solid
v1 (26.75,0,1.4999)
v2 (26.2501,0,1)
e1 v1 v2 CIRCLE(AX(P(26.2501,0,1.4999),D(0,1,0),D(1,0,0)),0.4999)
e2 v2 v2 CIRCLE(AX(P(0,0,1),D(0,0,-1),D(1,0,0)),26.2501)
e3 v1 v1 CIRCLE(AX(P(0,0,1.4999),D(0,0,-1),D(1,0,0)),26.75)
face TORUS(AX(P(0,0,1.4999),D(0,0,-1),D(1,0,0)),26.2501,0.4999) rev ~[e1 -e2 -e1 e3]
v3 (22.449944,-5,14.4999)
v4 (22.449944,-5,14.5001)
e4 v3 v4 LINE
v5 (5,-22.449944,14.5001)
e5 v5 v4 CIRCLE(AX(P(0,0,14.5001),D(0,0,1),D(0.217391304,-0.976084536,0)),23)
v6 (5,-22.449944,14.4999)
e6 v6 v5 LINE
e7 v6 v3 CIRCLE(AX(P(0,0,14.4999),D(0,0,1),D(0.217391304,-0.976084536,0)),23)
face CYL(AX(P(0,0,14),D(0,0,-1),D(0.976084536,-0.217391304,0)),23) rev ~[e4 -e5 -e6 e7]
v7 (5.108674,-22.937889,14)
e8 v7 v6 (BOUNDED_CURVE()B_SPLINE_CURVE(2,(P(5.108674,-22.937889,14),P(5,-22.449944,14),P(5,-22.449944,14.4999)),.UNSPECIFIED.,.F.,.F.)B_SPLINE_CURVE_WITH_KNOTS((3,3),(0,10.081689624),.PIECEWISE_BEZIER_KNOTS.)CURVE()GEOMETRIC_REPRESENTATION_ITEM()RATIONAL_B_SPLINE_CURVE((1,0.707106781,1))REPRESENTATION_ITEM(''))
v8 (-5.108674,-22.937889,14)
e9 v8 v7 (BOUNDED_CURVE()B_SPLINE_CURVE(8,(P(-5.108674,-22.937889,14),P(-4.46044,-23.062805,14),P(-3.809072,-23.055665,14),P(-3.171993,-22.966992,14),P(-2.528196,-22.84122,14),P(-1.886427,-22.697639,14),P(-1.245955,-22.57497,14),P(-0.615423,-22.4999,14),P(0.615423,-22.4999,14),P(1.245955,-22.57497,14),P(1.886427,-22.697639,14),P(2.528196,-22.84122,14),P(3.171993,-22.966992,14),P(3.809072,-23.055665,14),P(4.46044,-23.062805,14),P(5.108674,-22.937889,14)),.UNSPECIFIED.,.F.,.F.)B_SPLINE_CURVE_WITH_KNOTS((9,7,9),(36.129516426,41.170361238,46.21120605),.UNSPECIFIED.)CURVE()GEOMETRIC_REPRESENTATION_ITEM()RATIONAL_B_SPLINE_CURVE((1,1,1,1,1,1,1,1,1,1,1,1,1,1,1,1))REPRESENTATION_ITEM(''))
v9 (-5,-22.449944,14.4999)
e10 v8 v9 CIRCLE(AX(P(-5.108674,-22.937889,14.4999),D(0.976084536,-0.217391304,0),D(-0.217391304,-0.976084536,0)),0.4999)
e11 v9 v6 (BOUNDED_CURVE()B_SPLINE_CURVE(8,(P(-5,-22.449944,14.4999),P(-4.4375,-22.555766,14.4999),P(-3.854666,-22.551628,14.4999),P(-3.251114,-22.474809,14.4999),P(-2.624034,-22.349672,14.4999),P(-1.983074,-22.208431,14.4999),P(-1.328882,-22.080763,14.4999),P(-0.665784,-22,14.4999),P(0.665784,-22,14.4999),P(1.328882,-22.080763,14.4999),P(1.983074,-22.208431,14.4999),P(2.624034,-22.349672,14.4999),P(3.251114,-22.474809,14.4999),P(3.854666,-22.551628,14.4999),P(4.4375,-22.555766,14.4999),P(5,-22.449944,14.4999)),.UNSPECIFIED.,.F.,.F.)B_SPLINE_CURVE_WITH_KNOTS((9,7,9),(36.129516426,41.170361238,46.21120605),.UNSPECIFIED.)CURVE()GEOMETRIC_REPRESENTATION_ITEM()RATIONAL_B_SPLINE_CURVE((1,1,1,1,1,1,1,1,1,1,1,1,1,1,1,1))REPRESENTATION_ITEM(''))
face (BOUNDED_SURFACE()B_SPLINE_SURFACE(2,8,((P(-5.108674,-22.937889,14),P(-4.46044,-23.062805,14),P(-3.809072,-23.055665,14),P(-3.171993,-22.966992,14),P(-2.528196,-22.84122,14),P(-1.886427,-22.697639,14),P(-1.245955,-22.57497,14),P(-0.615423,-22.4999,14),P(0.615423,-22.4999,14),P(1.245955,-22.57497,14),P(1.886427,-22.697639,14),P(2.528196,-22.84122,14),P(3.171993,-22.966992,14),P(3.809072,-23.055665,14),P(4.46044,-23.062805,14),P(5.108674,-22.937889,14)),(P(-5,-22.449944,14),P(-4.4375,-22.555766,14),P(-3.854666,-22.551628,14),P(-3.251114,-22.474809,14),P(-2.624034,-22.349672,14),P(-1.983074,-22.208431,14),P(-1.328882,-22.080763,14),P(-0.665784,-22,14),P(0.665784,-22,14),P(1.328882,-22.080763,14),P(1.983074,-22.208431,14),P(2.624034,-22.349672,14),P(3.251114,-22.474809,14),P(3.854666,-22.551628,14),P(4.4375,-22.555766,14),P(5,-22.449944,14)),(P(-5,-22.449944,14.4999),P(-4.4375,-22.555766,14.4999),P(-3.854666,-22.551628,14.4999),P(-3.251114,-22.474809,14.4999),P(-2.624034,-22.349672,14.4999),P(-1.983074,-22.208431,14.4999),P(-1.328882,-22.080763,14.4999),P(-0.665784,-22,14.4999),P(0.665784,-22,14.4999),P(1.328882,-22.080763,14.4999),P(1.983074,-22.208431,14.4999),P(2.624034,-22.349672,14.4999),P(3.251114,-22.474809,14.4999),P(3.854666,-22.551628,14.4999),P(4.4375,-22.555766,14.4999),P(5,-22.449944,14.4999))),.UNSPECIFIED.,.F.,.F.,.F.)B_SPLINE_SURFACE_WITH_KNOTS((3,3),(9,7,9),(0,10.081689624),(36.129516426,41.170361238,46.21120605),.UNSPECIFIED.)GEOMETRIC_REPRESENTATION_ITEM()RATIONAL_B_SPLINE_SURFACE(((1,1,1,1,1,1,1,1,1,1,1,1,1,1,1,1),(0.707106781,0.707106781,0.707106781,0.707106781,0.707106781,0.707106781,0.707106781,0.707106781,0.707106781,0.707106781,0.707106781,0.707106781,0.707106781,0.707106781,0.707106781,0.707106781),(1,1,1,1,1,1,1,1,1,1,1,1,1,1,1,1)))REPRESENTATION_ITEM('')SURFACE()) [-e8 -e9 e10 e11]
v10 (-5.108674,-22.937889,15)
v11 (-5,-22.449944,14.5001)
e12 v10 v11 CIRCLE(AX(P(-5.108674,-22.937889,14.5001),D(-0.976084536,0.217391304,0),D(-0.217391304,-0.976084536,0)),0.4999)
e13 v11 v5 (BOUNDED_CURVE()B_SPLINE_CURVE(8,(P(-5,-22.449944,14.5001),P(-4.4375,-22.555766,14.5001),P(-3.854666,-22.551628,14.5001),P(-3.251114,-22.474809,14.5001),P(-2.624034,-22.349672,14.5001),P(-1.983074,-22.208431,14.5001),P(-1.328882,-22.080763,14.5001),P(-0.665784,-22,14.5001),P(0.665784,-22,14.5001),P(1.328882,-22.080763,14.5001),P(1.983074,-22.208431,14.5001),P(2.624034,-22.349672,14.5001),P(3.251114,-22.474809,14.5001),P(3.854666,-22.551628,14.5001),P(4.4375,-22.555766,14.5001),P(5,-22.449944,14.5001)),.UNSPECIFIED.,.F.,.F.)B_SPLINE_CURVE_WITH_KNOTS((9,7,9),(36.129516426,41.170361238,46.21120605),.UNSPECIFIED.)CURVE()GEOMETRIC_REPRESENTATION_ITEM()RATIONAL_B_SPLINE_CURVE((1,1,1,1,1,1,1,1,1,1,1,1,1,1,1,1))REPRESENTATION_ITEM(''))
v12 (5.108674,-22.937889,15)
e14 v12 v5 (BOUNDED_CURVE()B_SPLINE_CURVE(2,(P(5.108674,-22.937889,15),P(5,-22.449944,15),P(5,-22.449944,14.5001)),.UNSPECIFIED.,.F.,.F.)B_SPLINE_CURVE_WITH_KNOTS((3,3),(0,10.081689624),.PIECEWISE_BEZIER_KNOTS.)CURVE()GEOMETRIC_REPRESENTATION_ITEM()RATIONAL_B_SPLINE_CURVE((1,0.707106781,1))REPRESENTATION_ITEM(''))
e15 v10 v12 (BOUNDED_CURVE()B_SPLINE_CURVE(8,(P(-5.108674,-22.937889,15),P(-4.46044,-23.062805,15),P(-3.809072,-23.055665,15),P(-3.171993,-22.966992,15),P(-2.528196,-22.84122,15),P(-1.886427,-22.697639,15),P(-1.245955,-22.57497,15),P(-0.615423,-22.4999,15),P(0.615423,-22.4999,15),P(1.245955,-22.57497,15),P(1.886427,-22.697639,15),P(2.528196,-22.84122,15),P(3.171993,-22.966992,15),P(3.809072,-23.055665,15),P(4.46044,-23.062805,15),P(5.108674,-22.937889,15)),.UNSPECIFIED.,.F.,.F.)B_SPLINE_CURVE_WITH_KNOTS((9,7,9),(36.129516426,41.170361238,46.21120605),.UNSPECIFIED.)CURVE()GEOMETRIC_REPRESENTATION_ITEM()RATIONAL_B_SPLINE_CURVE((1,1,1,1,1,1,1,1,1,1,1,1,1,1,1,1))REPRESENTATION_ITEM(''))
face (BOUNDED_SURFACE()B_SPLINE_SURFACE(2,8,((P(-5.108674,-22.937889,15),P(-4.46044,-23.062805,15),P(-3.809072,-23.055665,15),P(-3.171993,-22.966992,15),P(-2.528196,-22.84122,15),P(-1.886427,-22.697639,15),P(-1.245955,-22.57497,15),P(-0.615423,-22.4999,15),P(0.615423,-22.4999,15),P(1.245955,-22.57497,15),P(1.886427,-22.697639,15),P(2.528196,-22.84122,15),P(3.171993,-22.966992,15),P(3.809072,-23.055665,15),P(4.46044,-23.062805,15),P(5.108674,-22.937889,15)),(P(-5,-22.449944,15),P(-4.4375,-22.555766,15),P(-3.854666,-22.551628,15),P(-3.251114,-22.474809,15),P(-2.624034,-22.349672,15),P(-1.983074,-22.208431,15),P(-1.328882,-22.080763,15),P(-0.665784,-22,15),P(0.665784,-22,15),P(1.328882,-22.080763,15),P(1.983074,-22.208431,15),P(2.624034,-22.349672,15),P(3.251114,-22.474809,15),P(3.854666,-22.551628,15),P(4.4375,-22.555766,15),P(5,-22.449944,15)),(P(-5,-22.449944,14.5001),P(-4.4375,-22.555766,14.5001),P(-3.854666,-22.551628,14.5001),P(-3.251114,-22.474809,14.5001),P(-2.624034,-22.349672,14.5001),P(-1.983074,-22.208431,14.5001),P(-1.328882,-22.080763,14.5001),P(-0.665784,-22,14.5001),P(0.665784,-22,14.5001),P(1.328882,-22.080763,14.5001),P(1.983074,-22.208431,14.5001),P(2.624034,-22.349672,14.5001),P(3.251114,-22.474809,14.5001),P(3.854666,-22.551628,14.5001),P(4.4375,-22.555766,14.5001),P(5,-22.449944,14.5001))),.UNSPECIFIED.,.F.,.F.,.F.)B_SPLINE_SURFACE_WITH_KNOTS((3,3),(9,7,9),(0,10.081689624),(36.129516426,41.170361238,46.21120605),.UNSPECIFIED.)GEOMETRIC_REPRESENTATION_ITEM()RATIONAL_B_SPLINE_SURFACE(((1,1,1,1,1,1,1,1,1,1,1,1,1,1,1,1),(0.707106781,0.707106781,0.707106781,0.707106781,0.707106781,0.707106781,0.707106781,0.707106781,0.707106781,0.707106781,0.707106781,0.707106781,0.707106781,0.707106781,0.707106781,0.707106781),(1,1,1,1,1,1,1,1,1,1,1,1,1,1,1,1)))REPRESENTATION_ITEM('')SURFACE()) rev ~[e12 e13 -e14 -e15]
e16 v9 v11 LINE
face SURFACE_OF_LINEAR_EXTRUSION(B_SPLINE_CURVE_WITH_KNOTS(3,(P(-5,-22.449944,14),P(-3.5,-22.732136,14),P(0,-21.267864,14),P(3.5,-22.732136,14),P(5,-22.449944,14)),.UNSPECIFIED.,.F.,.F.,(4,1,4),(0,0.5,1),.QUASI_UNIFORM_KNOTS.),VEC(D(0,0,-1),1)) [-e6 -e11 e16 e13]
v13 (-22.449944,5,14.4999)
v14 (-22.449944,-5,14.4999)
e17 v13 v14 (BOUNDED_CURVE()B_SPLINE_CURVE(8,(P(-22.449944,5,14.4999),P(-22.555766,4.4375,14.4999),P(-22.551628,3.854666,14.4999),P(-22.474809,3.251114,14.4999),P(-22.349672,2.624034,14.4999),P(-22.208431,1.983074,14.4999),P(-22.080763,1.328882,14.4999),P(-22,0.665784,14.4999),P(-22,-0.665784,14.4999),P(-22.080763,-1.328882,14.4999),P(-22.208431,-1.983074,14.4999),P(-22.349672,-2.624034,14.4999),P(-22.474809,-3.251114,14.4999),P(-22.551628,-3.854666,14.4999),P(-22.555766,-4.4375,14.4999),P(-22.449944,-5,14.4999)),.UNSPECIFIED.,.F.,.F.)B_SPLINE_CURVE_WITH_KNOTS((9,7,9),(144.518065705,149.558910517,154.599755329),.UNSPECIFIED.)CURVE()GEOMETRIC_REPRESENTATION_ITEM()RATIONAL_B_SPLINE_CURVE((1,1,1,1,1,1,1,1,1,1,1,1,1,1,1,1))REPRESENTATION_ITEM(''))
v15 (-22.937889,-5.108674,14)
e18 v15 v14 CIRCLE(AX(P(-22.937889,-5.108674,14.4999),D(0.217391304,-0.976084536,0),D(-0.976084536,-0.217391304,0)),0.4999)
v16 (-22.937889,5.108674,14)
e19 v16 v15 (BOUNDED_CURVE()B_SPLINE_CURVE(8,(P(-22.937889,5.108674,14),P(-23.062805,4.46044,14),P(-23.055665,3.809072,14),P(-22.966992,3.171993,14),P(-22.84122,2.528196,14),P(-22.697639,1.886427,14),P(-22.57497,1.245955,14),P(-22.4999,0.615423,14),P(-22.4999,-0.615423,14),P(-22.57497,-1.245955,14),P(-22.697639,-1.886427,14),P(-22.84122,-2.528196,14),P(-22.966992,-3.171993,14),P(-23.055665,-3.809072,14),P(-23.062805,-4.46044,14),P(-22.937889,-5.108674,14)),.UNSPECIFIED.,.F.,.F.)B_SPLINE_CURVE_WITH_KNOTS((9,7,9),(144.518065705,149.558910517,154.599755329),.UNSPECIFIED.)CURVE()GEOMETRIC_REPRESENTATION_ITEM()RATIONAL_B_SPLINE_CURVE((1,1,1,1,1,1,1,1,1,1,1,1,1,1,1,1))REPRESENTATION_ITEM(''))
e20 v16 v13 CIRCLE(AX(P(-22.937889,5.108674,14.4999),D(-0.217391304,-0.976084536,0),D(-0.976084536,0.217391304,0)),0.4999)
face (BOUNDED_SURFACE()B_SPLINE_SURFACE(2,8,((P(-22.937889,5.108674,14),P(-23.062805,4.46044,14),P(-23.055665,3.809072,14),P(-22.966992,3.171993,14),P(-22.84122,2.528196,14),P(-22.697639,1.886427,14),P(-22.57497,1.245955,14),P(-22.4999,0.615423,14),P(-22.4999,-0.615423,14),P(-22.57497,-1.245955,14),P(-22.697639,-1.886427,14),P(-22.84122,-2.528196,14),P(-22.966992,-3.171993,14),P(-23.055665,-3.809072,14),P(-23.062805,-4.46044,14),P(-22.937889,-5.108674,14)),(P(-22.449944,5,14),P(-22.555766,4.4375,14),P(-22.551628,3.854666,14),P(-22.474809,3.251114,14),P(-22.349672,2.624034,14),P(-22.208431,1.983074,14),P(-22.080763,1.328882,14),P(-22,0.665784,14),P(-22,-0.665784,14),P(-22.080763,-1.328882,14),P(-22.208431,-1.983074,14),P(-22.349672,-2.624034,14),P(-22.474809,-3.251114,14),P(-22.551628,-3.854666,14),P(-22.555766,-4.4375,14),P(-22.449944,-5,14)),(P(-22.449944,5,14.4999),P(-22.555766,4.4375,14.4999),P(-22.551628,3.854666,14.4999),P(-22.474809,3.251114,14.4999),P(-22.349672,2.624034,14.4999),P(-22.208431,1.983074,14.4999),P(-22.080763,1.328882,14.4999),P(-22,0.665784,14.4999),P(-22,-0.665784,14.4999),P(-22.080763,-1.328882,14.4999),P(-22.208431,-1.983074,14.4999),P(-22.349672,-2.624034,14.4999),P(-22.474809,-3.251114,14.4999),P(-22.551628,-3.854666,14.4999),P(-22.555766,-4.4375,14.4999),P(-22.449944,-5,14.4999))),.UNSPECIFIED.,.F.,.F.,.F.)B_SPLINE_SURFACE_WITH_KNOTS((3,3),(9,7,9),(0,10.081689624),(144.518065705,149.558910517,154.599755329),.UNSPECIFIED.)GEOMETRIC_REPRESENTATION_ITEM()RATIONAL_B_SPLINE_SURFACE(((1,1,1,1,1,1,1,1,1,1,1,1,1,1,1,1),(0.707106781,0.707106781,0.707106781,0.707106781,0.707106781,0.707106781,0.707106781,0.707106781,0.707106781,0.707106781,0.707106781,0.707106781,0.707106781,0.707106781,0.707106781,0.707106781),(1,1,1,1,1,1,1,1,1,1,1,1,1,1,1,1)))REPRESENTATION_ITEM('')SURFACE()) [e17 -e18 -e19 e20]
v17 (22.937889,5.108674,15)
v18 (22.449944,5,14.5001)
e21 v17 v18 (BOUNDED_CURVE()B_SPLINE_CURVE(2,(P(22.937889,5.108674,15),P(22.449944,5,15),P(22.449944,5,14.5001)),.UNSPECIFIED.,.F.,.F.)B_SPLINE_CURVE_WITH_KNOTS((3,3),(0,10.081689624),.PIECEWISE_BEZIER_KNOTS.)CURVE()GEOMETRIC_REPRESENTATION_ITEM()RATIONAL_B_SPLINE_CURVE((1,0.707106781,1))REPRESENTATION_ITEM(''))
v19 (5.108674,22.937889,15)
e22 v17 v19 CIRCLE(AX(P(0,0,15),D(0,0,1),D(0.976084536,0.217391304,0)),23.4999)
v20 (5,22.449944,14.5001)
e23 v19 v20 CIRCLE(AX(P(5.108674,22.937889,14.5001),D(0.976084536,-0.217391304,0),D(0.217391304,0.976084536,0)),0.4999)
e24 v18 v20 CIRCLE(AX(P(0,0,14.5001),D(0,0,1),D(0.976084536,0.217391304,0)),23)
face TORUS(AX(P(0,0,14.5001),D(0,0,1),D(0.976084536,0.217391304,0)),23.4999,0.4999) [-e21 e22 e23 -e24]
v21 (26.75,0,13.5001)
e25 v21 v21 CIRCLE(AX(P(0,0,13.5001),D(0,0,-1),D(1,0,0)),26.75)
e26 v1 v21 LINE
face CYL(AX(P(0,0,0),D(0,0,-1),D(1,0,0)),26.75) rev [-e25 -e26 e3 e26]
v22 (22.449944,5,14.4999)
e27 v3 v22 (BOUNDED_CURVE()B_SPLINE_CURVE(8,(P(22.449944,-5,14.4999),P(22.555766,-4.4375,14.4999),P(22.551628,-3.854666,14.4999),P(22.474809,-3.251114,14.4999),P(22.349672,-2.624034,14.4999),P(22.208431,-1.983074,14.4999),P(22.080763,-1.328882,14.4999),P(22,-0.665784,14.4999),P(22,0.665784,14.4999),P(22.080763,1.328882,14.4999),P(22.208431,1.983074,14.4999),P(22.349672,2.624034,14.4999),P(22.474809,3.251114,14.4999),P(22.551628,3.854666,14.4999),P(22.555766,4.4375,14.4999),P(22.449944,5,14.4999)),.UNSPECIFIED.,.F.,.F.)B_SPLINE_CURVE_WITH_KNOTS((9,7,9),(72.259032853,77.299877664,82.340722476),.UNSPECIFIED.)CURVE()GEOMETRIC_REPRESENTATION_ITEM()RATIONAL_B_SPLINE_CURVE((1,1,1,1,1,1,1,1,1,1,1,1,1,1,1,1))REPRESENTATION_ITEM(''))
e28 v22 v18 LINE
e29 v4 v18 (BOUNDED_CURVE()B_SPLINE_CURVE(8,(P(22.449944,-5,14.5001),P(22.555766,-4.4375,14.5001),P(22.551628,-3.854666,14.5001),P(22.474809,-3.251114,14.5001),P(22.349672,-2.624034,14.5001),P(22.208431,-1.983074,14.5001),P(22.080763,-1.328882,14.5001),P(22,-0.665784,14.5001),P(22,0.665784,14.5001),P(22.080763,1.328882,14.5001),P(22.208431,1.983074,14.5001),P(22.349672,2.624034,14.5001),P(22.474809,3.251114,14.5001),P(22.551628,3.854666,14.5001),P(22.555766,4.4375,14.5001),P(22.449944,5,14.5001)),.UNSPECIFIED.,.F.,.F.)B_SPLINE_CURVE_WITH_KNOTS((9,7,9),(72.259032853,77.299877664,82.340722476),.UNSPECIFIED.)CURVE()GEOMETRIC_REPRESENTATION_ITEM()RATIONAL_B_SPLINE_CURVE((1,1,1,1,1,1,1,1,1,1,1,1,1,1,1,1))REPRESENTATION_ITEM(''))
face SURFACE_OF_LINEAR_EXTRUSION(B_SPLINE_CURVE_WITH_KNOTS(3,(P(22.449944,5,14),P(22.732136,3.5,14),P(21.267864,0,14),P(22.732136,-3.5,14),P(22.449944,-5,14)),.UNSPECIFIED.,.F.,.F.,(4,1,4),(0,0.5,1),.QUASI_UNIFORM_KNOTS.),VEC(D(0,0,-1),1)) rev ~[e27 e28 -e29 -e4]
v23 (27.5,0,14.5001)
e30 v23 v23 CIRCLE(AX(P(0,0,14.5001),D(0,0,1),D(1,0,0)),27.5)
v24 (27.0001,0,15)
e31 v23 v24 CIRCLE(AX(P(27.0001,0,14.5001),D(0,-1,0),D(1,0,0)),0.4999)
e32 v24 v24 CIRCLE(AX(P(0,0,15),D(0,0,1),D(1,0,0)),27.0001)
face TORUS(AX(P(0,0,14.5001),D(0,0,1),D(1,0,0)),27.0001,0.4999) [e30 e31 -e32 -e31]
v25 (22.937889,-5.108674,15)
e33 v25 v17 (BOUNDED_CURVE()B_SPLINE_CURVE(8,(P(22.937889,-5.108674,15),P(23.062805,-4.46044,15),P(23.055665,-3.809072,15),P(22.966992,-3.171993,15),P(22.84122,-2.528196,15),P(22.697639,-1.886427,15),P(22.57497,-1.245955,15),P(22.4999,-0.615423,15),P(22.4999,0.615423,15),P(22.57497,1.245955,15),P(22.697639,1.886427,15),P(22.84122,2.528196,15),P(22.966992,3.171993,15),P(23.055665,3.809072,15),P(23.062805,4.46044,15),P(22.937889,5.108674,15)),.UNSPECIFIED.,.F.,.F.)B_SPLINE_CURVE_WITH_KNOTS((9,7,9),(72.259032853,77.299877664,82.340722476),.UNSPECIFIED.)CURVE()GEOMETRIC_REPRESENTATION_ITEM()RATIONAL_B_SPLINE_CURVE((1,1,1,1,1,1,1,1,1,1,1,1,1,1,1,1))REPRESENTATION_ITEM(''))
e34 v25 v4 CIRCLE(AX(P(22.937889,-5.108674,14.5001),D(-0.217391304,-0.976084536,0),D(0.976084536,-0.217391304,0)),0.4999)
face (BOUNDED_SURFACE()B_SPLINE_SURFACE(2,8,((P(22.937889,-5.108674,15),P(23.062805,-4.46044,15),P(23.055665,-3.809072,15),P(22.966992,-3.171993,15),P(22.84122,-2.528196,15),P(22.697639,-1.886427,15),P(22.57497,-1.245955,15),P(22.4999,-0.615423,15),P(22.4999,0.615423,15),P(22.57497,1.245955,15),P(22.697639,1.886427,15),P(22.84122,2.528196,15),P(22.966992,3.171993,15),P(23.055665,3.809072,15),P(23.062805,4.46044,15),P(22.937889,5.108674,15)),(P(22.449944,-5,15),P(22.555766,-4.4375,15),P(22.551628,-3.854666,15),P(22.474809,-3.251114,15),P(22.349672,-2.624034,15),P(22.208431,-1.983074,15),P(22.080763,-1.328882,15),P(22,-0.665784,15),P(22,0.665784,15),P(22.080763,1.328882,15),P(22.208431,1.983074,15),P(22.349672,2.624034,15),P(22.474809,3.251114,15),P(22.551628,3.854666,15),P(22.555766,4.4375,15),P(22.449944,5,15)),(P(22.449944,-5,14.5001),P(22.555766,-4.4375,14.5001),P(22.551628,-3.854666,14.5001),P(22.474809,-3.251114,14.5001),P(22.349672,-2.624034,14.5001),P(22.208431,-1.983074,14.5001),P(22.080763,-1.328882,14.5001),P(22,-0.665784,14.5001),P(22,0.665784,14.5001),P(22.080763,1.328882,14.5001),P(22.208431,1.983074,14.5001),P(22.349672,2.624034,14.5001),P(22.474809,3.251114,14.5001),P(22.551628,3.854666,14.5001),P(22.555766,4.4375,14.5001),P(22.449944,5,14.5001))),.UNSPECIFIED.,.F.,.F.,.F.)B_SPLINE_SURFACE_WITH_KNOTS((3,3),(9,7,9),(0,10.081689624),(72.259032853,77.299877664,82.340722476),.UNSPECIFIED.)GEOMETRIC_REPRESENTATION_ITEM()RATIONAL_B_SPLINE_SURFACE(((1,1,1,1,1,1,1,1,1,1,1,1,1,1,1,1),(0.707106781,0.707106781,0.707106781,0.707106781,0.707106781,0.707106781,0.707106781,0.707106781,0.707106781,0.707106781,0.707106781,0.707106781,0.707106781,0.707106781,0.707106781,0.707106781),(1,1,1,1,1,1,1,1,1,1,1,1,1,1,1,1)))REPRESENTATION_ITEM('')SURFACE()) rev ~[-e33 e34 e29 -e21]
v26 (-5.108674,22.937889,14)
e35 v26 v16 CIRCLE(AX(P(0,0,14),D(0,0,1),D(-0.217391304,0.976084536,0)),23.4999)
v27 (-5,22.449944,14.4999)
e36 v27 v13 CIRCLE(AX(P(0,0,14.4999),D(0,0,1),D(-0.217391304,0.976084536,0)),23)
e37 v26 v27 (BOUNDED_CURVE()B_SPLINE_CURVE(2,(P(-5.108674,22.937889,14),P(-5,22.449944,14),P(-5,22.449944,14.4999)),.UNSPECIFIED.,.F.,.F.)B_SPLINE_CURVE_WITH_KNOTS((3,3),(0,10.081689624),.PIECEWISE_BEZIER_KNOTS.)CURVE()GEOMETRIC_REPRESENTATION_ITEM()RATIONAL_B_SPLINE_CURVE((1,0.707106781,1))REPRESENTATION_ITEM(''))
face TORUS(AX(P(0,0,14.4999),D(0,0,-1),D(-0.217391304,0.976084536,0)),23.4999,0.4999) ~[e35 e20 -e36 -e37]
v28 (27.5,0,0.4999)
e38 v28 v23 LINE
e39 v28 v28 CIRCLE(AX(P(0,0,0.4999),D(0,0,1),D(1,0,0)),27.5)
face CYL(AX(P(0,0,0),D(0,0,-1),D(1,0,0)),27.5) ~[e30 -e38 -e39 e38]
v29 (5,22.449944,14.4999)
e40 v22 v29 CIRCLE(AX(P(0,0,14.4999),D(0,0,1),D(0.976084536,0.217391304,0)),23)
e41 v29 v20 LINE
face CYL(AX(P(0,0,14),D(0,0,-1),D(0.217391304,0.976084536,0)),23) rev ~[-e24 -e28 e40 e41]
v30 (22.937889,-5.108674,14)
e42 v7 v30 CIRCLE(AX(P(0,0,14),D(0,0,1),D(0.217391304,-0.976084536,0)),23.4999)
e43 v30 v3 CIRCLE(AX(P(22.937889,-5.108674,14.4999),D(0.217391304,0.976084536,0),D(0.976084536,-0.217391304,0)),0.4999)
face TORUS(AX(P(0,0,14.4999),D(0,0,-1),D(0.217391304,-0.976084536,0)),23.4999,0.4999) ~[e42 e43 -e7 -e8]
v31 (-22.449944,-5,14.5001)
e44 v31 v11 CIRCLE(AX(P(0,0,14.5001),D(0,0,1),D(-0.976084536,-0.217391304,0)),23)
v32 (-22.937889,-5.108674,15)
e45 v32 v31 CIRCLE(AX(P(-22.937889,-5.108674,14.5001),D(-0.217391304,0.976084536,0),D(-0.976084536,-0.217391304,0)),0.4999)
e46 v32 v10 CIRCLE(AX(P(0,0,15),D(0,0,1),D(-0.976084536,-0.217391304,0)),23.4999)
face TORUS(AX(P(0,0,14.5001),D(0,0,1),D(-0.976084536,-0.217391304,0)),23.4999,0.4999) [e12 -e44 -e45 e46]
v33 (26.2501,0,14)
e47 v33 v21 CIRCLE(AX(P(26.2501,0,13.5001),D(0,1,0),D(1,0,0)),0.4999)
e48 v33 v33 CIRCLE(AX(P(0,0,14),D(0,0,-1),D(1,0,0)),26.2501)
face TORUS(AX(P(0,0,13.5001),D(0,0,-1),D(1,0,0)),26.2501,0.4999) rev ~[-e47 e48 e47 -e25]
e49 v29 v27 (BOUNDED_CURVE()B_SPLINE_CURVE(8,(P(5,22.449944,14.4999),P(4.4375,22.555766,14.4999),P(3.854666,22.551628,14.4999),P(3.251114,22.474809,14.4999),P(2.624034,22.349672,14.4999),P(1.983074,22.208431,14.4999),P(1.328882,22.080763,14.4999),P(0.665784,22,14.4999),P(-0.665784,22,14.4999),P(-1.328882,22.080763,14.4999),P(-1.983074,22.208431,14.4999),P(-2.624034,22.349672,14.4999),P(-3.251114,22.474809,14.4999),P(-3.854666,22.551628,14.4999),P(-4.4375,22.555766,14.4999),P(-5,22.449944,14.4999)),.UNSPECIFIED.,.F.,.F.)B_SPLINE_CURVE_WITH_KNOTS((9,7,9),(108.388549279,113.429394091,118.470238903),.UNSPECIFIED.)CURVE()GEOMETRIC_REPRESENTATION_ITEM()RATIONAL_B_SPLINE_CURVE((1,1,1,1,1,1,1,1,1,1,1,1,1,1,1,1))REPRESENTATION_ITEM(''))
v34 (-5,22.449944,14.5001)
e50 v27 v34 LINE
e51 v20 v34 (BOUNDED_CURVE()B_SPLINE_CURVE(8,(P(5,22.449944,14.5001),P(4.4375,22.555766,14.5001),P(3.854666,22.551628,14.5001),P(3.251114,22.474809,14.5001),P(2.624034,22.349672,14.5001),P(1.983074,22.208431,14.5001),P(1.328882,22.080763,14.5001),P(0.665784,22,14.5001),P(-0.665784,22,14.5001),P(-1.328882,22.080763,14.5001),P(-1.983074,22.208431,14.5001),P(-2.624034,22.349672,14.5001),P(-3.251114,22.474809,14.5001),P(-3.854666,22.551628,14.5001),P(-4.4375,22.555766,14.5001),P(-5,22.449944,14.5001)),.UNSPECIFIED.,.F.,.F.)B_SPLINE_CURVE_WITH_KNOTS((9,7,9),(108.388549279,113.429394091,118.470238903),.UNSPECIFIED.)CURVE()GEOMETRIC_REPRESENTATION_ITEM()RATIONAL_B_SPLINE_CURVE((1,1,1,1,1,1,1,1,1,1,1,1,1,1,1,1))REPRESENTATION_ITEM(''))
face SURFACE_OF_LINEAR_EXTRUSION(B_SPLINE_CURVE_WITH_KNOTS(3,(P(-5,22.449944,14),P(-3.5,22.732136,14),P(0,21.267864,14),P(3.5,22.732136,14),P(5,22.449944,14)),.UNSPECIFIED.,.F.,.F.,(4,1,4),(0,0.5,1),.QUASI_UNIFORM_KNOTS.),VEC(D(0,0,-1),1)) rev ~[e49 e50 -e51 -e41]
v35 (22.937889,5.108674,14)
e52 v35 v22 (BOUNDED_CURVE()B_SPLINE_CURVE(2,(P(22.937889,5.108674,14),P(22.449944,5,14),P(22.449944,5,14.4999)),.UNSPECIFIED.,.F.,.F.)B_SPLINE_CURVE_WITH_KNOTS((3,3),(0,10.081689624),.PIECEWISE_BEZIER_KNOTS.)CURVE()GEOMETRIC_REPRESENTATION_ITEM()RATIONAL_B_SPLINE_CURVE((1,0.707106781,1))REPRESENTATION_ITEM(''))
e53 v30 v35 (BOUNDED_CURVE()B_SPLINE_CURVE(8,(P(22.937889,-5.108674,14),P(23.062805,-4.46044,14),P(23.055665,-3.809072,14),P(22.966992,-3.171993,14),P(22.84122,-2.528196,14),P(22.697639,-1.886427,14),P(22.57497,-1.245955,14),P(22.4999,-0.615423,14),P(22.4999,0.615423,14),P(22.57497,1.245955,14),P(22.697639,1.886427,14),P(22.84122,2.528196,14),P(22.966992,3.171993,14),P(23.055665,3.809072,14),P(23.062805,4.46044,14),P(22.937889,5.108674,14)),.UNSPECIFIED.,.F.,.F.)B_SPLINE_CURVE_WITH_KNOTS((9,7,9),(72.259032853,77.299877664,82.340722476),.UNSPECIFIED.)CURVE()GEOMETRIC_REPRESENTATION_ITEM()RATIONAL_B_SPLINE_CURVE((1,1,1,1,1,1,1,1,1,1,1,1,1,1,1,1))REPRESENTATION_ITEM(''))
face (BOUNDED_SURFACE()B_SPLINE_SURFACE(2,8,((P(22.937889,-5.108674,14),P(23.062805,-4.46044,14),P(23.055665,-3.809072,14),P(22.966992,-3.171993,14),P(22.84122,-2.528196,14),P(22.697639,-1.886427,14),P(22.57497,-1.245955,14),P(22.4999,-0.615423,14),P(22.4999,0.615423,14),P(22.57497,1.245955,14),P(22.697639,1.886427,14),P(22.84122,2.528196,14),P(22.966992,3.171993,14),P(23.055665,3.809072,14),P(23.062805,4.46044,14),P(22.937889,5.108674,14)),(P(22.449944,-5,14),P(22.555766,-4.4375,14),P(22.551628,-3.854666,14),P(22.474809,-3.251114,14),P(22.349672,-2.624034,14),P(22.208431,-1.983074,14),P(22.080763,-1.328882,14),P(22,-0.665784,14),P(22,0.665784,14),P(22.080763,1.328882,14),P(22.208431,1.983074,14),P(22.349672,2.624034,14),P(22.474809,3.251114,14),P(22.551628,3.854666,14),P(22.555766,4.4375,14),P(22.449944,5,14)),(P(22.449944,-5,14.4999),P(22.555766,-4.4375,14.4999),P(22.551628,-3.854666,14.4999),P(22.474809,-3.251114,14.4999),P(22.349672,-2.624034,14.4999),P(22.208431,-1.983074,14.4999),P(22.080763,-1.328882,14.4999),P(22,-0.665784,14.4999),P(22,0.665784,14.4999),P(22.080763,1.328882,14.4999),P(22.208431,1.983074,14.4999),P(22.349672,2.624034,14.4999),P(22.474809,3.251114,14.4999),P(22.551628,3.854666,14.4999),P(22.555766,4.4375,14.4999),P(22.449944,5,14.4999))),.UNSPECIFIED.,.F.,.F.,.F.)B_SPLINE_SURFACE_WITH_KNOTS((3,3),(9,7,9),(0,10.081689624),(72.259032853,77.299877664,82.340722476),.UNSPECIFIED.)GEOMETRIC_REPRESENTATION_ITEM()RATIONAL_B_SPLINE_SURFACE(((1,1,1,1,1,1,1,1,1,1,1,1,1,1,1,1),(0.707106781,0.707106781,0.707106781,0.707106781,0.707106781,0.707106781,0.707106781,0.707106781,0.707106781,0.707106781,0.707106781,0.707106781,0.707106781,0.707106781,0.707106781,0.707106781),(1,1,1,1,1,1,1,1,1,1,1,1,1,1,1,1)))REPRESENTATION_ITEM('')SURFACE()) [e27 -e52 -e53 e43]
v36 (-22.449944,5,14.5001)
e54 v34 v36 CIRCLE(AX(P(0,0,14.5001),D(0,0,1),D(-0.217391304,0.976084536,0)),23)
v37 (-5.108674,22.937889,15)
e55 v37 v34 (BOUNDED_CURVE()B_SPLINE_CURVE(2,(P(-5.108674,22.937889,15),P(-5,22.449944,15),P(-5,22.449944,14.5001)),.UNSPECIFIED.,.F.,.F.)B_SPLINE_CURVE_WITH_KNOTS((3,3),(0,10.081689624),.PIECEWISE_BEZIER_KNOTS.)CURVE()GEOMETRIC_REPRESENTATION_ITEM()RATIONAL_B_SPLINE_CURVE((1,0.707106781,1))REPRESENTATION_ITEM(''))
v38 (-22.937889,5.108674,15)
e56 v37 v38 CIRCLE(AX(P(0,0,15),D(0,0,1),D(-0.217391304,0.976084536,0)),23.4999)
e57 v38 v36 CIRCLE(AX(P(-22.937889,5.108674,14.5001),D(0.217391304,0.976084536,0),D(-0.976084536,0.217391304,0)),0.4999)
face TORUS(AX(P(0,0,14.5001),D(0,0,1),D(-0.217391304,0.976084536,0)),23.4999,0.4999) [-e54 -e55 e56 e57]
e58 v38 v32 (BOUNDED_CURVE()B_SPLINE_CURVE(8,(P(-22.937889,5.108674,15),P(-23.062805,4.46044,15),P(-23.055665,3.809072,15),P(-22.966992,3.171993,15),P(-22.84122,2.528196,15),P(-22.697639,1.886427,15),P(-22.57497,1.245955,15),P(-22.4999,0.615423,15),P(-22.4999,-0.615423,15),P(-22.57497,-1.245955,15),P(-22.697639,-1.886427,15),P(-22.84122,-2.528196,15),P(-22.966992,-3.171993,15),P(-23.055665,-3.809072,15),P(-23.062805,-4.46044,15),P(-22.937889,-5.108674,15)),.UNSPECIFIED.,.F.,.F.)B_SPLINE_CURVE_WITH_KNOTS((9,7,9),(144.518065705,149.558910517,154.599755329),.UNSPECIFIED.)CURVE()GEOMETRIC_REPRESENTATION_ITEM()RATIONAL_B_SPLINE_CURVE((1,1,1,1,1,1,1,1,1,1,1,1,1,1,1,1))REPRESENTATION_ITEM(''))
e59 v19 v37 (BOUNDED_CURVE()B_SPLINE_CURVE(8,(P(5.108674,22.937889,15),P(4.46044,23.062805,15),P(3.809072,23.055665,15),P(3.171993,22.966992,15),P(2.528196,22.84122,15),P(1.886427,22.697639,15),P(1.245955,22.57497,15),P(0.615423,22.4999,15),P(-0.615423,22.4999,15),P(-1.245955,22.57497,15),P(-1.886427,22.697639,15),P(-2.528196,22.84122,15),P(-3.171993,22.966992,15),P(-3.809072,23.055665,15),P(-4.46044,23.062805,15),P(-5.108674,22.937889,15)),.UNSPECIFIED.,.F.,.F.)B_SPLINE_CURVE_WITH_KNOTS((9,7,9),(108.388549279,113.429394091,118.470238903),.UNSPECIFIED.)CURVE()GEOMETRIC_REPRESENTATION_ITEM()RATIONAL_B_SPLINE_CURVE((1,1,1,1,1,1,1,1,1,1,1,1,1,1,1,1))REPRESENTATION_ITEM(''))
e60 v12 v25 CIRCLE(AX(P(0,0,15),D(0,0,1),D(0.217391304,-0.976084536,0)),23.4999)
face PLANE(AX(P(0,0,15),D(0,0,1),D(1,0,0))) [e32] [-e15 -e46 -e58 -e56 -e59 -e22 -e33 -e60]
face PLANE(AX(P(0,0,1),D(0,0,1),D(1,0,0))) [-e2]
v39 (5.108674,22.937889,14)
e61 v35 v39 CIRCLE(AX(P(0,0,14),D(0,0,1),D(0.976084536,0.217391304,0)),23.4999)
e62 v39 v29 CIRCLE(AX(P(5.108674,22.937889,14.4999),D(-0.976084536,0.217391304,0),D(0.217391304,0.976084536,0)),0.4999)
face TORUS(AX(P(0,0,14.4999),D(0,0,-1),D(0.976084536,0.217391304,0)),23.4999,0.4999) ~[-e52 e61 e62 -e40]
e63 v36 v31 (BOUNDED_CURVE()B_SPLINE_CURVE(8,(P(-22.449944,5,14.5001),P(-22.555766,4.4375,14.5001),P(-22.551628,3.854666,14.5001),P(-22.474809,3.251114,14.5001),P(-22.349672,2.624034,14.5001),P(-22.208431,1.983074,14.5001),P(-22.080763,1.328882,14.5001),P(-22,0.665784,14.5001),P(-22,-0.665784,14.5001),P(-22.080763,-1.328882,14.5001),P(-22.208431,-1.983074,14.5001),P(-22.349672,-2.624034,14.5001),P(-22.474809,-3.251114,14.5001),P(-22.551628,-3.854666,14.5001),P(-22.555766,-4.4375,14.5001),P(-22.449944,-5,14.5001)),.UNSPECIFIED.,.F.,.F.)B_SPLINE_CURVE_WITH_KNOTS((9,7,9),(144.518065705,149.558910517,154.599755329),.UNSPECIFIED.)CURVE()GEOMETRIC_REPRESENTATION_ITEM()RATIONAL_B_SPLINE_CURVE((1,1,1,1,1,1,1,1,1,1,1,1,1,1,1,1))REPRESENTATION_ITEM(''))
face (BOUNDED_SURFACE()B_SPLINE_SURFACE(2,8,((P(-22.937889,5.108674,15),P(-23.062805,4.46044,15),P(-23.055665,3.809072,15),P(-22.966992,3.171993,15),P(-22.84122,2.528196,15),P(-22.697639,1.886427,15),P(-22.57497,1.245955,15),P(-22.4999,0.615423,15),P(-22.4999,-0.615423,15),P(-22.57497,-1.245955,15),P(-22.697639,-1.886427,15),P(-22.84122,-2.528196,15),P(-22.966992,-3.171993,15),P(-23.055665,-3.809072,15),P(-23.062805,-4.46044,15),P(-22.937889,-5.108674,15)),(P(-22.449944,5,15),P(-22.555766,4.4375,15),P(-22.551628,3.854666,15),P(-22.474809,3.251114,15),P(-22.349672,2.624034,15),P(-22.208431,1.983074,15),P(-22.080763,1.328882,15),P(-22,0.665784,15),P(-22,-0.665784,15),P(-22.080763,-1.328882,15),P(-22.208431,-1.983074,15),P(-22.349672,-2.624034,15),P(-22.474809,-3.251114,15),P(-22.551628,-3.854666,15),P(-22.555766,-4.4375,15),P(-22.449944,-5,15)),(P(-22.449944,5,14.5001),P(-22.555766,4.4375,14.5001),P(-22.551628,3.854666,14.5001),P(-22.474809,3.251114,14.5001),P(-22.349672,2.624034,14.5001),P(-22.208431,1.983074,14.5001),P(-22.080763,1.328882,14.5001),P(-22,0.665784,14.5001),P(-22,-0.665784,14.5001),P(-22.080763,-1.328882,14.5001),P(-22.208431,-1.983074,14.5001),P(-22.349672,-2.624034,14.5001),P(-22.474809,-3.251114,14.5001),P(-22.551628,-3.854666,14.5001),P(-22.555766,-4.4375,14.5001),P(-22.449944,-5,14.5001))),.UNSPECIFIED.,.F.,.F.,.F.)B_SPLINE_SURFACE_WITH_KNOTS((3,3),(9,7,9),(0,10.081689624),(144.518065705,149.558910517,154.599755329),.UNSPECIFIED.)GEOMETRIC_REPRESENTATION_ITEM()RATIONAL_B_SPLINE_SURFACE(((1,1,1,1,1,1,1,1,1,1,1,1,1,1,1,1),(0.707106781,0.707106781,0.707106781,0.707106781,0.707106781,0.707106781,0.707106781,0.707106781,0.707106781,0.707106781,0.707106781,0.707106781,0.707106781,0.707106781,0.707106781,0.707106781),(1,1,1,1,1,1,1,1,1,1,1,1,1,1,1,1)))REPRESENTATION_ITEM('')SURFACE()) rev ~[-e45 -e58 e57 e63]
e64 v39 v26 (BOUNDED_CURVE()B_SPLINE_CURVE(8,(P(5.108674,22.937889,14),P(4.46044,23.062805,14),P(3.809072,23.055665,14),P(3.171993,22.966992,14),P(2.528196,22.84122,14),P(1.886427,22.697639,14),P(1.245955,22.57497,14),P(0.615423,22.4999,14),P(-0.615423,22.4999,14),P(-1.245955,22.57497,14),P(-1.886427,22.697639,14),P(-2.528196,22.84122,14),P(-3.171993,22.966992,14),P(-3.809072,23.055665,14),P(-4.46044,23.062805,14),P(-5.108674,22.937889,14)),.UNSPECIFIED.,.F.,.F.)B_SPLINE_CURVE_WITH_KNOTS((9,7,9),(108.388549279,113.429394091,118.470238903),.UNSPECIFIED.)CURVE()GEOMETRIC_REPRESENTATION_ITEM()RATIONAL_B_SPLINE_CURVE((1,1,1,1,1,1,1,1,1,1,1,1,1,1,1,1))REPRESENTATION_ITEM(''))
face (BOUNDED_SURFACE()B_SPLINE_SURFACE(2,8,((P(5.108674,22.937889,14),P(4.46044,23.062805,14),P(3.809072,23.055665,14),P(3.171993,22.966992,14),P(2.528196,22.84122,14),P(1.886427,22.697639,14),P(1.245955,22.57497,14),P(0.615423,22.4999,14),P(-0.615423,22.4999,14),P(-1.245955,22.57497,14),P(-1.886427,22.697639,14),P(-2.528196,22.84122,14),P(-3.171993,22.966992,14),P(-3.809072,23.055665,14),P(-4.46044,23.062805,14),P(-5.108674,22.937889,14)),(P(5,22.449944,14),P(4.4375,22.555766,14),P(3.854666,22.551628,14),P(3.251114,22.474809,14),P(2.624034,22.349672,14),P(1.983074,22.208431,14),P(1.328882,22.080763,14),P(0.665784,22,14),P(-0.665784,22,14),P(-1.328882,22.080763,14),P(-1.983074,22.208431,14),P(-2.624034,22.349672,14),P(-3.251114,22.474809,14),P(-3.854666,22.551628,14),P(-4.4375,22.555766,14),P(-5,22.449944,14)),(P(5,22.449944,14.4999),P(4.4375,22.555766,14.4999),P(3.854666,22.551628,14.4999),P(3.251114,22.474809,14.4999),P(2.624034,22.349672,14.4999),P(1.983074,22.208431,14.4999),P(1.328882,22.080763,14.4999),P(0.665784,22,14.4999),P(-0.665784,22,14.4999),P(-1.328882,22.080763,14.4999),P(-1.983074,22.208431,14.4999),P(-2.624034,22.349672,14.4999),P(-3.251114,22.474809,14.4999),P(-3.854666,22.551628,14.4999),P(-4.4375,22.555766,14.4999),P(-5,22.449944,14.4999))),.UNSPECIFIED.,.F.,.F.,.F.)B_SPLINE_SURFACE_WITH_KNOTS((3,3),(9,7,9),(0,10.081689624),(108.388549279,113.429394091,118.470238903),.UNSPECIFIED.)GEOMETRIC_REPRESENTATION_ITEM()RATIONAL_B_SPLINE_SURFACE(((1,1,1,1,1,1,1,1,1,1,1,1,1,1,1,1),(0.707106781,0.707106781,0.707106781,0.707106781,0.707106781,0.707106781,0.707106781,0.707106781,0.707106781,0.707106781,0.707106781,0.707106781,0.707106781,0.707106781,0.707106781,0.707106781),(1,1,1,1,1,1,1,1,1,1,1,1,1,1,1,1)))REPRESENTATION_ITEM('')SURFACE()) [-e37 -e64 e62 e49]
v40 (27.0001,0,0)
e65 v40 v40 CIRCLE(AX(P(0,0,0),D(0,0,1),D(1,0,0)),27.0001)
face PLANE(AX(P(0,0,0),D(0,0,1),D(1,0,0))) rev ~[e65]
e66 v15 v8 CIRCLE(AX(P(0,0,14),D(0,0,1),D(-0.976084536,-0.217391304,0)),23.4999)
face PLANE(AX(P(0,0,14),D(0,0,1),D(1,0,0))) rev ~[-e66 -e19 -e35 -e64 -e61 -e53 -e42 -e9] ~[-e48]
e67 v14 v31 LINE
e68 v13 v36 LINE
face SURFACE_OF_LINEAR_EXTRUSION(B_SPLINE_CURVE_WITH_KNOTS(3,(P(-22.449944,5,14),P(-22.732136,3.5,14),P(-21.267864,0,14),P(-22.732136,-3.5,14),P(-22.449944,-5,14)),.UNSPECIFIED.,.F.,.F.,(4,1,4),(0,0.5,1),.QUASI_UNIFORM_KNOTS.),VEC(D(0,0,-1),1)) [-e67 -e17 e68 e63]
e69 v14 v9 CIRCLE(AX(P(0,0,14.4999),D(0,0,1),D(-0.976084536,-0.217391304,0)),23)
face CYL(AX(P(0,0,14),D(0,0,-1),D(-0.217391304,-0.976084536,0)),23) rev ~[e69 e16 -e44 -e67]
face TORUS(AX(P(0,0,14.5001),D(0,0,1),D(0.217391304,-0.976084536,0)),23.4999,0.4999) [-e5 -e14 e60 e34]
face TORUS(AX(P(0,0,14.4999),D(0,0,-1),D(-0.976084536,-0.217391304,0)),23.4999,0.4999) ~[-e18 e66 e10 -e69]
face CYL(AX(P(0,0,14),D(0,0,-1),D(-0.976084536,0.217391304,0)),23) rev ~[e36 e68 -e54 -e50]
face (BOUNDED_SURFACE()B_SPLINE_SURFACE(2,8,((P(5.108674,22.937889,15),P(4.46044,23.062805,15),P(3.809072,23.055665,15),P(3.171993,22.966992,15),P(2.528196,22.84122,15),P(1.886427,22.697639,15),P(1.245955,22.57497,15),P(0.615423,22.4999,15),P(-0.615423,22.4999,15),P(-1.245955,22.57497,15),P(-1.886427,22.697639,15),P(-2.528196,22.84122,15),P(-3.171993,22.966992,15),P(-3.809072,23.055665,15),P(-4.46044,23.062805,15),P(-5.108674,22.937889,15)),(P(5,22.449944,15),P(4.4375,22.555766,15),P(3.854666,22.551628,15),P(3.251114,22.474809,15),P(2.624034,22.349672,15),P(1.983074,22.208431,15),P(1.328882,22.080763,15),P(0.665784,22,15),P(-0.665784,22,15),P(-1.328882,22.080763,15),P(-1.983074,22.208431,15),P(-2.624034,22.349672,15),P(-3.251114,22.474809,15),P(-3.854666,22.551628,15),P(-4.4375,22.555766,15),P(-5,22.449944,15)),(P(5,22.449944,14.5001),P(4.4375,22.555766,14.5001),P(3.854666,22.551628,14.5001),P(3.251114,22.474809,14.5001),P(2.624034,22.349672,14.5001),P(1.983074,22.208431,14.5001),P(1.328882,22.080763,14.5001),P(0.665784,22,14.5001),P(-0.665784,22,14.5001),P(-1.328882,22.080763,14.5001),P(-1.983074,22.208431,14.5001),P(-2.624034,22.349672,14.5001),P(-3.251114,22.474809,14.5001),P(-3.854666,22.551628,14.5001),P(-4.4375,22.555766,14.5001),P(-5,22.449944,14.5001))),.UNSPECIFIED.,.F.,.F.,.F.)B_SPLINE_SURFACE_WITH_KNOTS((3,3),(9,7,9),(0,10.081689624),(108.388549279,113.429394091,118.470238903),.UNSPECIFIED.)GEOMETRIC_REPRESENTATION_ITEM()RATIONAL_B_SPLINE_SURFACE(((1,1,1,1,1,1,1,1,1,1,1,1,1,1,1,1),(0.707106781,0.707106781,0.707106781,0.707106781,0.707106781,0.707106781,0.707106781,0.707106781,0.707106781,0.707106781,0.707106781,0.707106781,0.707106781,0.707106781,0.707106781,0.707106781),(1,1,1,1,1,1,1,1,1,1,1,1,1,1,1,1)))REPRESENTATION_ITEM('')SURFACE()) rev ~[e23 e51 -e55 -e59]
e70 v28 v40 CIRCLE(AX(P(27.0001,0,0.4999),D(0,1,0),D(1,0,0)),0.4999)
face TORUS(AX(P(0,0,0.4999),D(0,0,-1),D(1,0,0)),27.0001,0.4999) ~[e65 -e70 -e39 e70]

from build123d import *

# Parameters (mm, degrees)
F0_R     = 27.5
F0_R_2   = 26.75
F1_DEPTH = 1
F2_DEPTH = 15
F3_START = 14
F3_DEPTH = 1
F4_R     = 0.4999


# Not quite as in the source:
# - a fillet or chamfer is up to 0.001 mm smaller than in the source, because OpenCascade refuses the exact size


with BuildPart() as f1:
    # F0 (on Top) → F1 (new body)
    with BuildSketch(Plane.XY):
        Circle(F0_R)
        Circle(F0_R_2, mode=Mode.SUBTRACT)
        Circle(F0_R_2)
        with BuildLine():
            ThreePointArc((22.4499443206, 5), (22.8620725151, 2.5150825658), (23, 0))
            ThreePointArc((23, 0), (22.8620725151, -2.5150825658), (22.4499443206, -5))
            ThreePointArc((22.4499443206, -5), (16.2634559673, -16.2634559673), (5, -22.4499443206))
            ThreePointArc((5, -22.4499443206), (0, -23), (-5, -22.4499443206))
            ThreePointArc((-5, -22.4499443206), (-16.2634559673, -16.2634559673), (-22.4499443206, -5))
            ThreePointArc((-22.4499443206, -5), (-23, 0), (-22.4499443206, 5))
            ThreePointArc((-22.4499443206, 5), (-16.2634559673, 16.2634559673), (-5, 22.4499443206))
            ThreePointArc((-5, 22.4499443206), (0, 23), (5, 22.4499443206))
            ThreePointArc((5, 22.4499443206), (16.2634559673, 16.2634559673), (22.4499443206, 5))
        make_face(mode=Mode.SUBTRACT)
        with BuildLine():
            add(Edge.make_bspline(
                [(22.4499443206, 5), (22.7321358433, 3.5), (21.2678641567, 0), (22.7321358433, -3.5), (22.4499443206, -5)],
                knots=[0, 0, 0, 0, 0.5, 1, 1, 1, 1], degree=3))
            ThreePointArc((22.4499443206, 5), (16.2634559673, 16.2634559673), (5, 22.4499443206))
            add(Edge.make_bspline(
                [(-5, 22.4499443206), (-3.5, 22.7321358433), (0, 21.2678641567), (3.5, 22.7321358433), (5, 22.4499443206)],
                knots=[0, 0, 0, 0, 0.5, 1, 1, 1, 1], degree=3))
            ThreePointArc((-5, 22.4499443206), (-16.2634559673, 16.2634559673), (-22.4499443206, 5))
            add(Edge.make_bspline(
                [(-22.4499443206, 5), (-22.7321358433, 3.5), (-21.2678641567, 0), (-22.7321358433, -3.5), (-22.4499443206, -5)],
                knots=[0, 0, 0, 0, 0.5, 1, 1, 1, 1], degree=3))
            ThreePointArc((-22.4499443206, -5), (-16.2634559673, -16.2634559673), (-5, -22.4499443206))
            add(Edge.make_bspline(
                [(-5, -22.4499443206), (-3.5, -22.7321358433), (0, -21.2678641567), (3.5, -22.7321358433), (5, -22.4499443206)],
                knots=[0, 0, 0, 0, 0.5, 1, 1, 1, 1], degree=3))
            ThreePointArc((5, -22.4499443206), (16.2634559673, -16.2634559673), (22.4499443206, -5))
        make_face()
        with BuildLine():
            ThreePointArc((-5, -22.4499443206), (0, -23), (5, -22.4499443206))
            add(Edge.make_bspline(
                [(-5, -22.4499443206), (-3.5, -22.7321358433), (0, -21.2678641567), (3.5, -22.7321358433), (5, -22.4499443206)],
                knots=[0, 0, 0, 0, 0.5, 1, 1, 1, 1], degree=3))
        make_face()
        with BuildLine():
            add(Edge.make_bspline(
                [(-5, 22.4499443206), (-3.5, 22.7321358433), (0, 21.2678641567), (3.5, 22.7321358433), (5, 22.4499443206)],
                knots=[0, 0, 0, 0, 0.5, 1, 1, 1, 1], degree=3))
            ThreePointArc((5, 22.4499443206), (0, 23), (-5, 22.4499443206))
        make_face()
        with BuildLine():
            add(Edge.make_bspline(
                [(-22.4499443206, 5), (-22.7321358433, 3.5), (-21.2678641567, 0), (-22.7321358433, -3.5), (-22.4499443206, -5)],
                knots=[0, 0, 0, 0, 0.5, 1, 1, 1, 1], degree=3))
            ThreePointArc((-22.4499443206, 5), (-23, 0), (-22.4499443206, -5))
        make_face()
        with BuildLine():
            ThreePointArc((22.4499443206, -5), (22.8620725151, -2.5150825658), (23, 0))
            ThreePointArc((23, 0), (22.8620725151, 2.5150825658), (22.4499443206, 5))
            add(Edge.make_bspline(
                [(22.4499443206, 5), (22.7321358433, 3.5), (21.2678641567, 0), (22.7321358433, -3.5), (22.4499443206, -5)],
                knots=[0, 0, 0, 0, 0.5, 1, 1, 1, 1], degree=3))
        make_face()
    extrude(amount=F1_DEPTH)

    # F0 (on Top) → F2 (join)
    with BuildSketch(Plane.XY):
        Circle(F0_R)
        Circle(F0_R_2, mode=Mode.SUBTRACT)
    extrude(amount=F2_DEPTH)

    # F0 (on Top) → F3 (join)
    with BuildSketch(Plane.XY.offset(F3_START)):
        Circle(F0_R)
        Circle(F0_R_2, mode=Mode.SUBTRACT)
        Circle(F0_R_2)
        with BuildLine():
            ThreePointArc((22.4499443206, 5), (22.8620725151, 2.5150825658), (23, 0))
            ThreePointArc((23, 0), (22.8620725151, -2.5150825658), (22.4499443206, -5))
            ThreePointArc((22.4499443206, -5), (16.2634559673, -16.2634559673), (5, -22.4499443206))
            ThreePointArc((5, -22.4499443206), (0, -23), (-5, -22.4499443206))
            ThreePointArc((-5, -22.4499443206), (-16.2634559673, -16.2634559673), (-22.4499443206, -5))
            ThreePointArc((-22.4499443206, -5), (-23, 0), (-22.4499443206, 5))
            ThreePointArc((-22.4499443206, 5), (-16.2634559673, 16.2634559673), (-5, 22.4499443206))
            ThreePointArc((-5, 22.4499443206), (0, 23), (5, 22.4499443206))
            ThreePointArc((5, 22.4499443206), (16.2634559673, 16.2634559673), (22.4499443206, 5))
        make_face(mode=Mode.SUBTRACT)
        with BuildLine():
            add(Edge.make_bspline(
                [(-5, 22.4499443206), (-3.5, 22.7321358433), (0, 21.2678641567), (3.5, 22.7321358433), (5, 22.4499443206)],
                knots=[0, 0, 0, 0, 0.5, 1, 1, 1, 1], degree=3))
            ThreePointArc((5, 22.4499443206), (0, 23), (-5, 22.4499443206))
        make_face()
        with BuildLine():
            ThreePointArc((-5, -22.4499443206), (0, -23), (5, -22.4499443206))
            add(Edge.make_bspline(
                [(-5, -22.4499443206), (-3.5, -22.7321358433), (0, -21.2678641567), (3.5, -22.7321358433), (5, -22.4499443206)],
                knots=[0, 0, 0, 0, 0.5, 1, 1, 1, 1], degree=3))
        make_face()
        with BuildLine():
            add(Edge.make_bspline(
                [(-22.4499443206, 5), (-22.7321358433, 3.5), (-21.2678641567, 0), (-22.7321358433, -3.5), (-22.4499443206, -5)],
                knots=[0, 0, 0, 0, 0.5, 1, 1, 1, 1], degree=3))
            ThreePointArc((-22.4499443206, 5), (-23, 0), (-22.4499443206, -5))
        make_face()
        with BuildLine():
            ThreePointArc((22.4499443206, -5), (22.8620725151, -2.5150825658), (23, 0))
            ThreePointArc((23, 0), (22.8620725151, 2.5150825658), (22.4499443206, 5))
            add(Edge.make_bspline(
                [(22.4499443206, 5), (22.7321358433, 3.5), (21.2678641567, 0), (22.7321358433, -3.5), (22.4499443206, -5)],
                knots=[0, 0, 0, 0, 0.5, 1, 1, 1, 1], degree=3))
        make_face()
    extrude(amount=F3_DEPTH)

    # F4 (radius 0.5 in the source; OpenCascade refuses exactly that, so slightly less here)
    f4_edges = [f1.edges().sort_by_distance(p)[0] for p in [
        (-26.75, 0, 1),
        (-27.5, 0, 0),
        (-27.5, 0, 15),
        (-22, 0, 14),
        (-22, 0, 15),
        (-16.263456, -16.263456, 15),
        (-16.263456, -16.263456, 14),
        (16.263456, -16.263456, 15),
        (0, -22, 15),
        (0, -22, 14),
        (16.263456, -16.263456, 14),
        (22, 0, 15),
        (22, 0, 14),
        (-16.263456, 16.263456, 15),
        (-16.263456, 16.263456, 14),
        (0, 22, 15),
        (0, 22, 14),
        (16.263456, 16.263456, 14),
        (16.263456, 16.263456, 15),
        (-26.75, 0, 14),
    ]]
    fillet(f4_edges, radius=F4_R)


solid = f1.part
